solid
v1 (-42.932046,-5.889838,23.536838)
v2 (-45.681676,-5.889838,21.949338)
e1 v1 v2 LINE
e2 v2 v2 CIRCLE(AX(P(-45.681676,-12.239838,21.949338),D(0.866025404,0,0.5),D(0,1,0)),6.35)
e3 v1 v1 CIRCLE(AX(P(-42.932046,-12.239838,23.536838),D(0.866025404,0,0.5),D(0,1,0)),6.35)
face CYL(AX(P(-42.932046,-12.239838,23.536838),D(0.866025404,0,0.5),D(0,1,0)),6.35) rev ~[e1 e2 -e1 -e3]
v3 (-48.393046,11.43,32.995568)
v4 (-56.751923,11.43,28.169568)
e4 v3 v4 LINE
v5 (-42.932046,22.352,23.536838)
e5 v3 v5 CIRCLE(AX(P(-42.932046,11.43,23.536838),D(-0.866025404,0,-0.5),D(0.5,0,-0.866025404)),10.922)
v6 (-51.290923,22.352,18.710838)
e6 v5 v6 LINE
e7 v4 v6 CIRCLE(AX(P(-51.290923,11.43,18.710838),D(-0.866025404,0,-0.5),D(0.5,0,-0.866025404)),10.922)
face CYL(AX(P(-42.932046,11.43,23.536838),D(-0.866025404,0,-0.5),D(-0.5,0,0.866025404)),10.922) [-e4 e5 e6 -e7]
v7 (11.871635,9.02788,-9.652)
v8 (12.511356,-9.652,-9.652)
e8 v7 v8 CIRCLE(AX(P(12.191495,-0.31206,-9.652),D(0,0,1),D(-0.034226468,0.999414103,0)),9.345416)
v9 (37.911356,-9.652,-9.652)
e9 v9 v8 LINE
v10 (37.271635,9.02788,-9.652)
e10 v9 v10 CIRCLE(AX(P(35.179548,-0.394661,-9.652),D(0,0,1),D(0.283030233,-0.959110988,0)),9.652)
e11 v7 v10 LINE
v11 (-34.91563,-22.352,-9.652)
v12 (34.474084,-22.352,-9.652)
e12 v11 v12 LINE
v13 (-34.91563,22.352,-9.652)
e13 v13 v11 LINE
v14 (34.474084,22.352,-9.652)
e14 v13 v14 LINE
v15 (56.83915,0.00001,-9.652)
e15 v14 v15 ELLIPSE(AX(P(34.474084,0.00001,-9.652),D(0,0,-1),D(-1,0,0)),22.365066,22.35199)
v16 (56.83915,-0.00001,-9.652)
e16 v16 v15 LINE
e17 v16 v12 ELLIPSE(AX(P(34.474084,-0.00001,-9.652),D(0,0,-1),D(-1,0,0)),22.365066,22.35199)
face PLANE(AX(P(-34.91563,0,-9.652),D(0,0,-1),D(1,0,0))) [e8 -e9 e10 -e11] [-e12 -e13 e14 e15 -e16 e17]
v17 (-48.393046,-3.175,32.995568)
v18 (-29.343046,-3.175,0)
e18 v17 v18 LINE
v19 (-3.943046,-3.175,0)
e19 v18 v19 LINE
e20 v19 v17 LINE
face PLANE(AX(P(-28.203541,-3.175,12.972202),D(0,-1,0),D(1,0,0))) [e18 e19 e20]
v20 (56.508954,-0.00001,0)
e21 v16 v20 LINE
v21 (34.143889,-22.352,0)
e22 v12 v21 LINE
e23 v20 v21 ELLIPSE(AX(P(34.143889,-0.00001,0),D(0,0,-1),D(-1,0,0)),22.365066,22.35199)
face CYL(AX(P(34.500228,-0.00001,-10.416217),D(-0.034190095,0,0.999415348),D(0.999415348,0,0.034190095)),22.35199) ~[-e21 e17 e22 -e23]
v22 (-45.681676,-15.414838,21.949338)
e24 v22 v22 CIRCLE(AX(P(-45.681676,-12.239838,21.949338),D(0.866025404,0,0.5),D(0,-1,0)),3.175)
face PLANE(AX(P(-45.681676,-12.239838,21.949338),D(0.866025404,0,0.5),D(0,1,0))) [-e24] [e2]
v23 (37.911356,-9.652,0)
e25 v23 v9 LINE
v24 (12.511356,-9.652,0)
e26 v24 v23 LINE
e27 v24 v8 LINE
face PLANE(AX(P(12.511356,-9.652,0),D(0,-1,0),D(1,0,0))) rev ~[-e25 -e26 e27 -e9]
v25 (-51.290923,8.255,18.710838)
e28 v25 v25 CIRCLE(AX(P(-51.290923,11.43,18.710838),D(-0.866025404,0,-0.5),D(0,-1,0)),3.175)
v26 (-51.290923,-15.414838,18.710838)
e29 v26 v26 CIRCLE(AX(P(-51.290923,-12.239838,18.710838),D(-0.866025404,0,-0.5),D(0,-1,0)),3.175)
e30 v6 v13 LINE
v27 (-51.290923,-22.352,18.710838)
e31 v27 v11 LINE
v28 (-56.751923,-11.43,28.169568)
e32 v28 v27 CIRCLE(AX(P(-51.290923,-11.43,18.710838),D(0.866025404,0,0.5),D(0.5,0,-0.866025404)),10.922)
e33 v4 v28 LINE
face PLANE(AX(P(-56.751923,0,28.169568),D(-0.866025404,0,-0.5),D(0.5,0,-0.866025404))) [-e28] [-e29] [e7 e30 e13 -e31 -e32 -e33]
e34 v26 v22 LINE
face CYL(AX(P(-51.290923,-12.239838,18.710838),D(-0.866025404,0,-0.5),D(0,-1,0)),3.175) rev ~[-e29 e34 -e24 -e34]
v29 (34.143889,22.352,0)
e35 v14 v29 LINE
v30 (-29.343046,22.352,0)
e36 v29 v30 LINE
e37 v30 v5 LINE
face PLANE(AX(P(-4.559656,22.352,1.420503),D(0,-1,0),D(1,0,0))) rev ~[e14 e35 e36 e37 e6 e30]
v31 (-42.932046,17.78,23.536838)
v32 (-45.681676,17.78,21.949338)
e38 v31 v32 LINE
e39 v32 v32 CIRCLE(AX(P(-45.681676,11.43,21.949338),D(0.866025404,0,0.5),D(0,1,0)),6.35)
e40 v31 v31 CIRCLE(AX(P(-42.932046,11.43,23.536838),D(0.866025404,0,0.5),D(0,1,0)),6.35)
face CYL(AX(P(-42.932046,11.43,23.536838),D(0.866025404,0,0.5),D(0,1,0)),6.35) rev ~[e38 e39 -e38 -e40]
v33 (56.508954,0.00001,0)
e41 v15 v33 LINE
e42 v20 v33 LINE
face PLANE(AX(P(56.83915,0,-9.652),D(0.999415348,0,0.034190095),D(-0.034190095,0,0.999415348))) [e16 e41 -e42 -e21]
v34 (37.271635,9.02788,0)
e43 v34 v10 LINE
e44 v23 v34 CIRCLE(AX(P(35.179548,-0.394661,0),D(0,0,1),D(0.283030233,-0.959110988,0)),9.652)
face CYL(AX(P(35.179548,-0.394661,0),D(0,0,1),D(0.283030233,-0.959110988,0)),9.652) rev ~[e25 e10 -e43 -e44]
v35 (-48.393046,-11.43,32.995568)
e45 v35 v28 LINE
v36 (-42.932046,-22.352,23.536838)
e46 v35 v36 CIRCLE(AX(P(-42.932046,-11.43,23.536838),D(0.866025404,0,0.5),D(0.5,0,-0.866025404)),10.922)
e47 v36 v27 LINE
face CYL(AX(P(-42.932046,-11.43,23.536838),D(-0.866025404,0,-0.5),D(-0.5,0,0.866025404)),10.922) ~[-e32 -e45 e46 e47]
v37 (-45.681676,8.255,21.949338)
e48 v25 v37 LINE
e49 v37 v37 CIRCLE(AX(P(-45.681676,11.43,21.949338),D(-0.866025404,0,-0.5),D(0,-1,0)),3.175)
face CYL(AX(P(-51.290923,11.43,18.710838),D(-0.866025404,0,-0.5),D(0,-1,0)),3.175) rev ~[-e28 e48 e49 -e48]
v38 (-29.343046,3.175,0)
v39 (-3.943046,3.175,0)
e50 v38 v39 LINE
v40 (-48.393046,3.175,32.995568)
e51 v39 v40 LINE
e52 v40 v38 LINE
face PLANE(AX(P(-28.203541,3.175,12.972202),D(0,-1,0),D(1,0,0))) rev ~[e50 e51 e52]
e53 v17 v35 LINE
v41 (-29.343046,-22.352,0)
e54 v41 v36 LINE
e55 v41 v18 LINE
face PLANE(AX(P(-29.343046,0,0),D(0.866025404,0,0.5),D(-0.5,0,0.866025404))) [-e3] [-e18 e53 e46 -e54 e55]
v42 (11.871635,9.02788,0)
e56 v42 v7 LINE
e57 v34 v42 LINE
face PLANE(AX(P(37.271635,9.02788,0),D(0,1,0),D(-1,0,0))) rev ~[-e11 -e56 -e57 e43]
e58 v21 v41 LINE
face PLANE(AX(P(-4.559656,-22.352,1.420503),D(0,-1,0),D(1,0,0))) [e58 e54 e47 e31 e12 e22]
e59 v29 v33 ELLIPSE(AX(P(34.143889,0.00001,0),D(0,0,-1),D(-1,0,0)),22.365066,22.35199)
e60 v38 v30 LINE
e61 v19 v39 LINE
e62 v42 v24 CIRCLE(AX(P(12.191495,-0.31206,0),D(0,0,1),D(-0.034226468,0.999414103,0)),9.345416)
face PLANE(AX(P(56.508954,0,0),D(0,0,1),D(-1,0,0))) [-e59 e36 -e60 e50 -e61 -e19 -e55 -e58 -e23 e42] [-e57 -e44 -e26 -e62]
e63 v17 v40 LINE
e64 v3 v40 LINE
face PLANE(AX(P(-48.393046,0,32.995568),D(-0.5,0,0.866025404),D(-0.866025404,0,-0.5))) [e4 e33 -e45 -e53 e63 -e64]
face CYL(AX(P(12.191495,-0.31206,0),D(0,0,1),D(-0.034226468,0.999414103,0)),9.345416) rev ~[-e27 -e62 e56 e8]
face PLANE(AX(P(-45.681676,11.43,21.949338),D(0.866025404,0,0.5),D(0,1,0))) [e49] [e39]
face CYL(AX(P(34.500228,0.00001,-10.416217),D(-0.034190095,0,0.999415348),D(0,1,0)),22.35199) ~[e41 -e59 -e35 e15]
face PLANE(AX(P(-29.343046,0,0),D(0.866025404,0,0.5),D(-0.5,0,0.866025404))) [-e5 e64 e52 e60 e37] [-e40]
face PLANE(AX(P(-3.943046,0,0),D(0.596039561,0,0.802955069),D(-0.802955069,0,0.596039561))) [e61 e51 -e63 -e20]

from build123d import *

# Parameters (mm, degrees)
F1_DEPTH  = 22.352
F2_DEPTH  = 3.175
F4_R      = 22.35199
F5_R      = 3.175
F6_DEPTH  = 25.4
F7_R      = 6.35
F7_R_2    = 3.175
F8_DEPTH  = 3.175
F9_R      = 10.922
F10_DEPTH = 25.4


# Not quite as in the source:
# - a fillet or chamfer is up to 0.001 mm smaller than in the source, because OpenCascade refuses the exact size


with BuildPart() as f1:
    # F0 (on Front) → F1 (new body, symmetric)
    with BuildSketch(Plane.XZ):
        Polygon((-3.9430456236, 0), (-29.3430456236, 0), (-48.3930456236, 32.9955678842), (-56.7519228209, 28.1695678842), (-34.9156304218, -9.652), (56.8391502193, -9.652), (56.5089543764, 0), align=None)
    extrude(amount=F1_DEPTH, both=True)

    # F0 (on Front) → F2 (join, symmetric)
    with BuildSketch(Plane.XZ):
        Polygon((-48.3930456236, 32.9955678842), (-29.3430456236, 0), (-3.9430456236, 0), align=None)
    extrude(amount=F2_DEPTH, both=True)

    # F4 (radius 22.352 in the source; OpenCascade refuses exactly that, so slightly less here)
    f4_edges = [f1.edges().sort_by_distance(p)[0] for p in [
        (56.674052, -22.352, -4.826),
        (56.674052, 22.352, -4.826),
    ]]
    fillet(f4_edges, radius=F4_R)

    # F5 (on face) → F6 (cut)
    with BuildSketch(Plane(origin=(-30.366161415, 0, -17.5319114672), x_dir=(0, -1, 0), z_dir=(-0.8660254038, 0, -0.5))):
        with Locations((-11.43, 41.8495228118)):
            Circle(F5_R)
        with Locations((12.2398376594, 41.8495228118)):
            Circle(F5_R)
    extrude(amount=-F6_DEPTH, mode=Mode.SUBTRACT)

    # F7 (on face) → F8 (cut)
    with BuildSketch(Plane(origin=(-22.0072842177, 0, -12.7059114672), x_dir=(0, 1, 0), z_dir=(0.8660254038, 0, 0.5))):
        with Locations((-12.2398376594, 41.8495228118)):
            Circle(F7_R)
        with Locations((-12.2398376594, 41.8495228118)):
            Circle(F7_R_2, mode=Mode.SUBTRACT)
        with Locations((11.43, 41.8495228118)):
            Circle(F7_R)
    extrude(amount=-F8_DEPTH, mode=Mode.SUBTRACT)

    # F9
    f9_edges = [f1.edges().sort_by_distance(p)[0] for p in [
        (-52.572484, 22.352, 30.582568),
        (-52.572484, -22.352, 30.582568),
    ]]
    fillet(f9_edges, radius=F9_R)

    # F3 (on face) → F10 (cut)
    with BuildSketch(Plane.XY):
        with BuildLine():
            Line((37.2716346684, 9.027880175), (11.8716346684, 9.027880175))
            ThreePointArc((11.8716346684, 9.027880175), (2.8515551479, -0.6319204795), (12.5113558024, -9.652))
            Line((12.5113558024, -9.652), (37.9113558024, -9.652))
            ThreePointArc((37.9113558024, -9.652), (44.825892917, -0.0643068731), (37.2716346684, 9.027880175))
        make_face()
    extrude(amount=-F10_DEPTH, mode=Mode.SUBTRACT)


solid = f1.part
